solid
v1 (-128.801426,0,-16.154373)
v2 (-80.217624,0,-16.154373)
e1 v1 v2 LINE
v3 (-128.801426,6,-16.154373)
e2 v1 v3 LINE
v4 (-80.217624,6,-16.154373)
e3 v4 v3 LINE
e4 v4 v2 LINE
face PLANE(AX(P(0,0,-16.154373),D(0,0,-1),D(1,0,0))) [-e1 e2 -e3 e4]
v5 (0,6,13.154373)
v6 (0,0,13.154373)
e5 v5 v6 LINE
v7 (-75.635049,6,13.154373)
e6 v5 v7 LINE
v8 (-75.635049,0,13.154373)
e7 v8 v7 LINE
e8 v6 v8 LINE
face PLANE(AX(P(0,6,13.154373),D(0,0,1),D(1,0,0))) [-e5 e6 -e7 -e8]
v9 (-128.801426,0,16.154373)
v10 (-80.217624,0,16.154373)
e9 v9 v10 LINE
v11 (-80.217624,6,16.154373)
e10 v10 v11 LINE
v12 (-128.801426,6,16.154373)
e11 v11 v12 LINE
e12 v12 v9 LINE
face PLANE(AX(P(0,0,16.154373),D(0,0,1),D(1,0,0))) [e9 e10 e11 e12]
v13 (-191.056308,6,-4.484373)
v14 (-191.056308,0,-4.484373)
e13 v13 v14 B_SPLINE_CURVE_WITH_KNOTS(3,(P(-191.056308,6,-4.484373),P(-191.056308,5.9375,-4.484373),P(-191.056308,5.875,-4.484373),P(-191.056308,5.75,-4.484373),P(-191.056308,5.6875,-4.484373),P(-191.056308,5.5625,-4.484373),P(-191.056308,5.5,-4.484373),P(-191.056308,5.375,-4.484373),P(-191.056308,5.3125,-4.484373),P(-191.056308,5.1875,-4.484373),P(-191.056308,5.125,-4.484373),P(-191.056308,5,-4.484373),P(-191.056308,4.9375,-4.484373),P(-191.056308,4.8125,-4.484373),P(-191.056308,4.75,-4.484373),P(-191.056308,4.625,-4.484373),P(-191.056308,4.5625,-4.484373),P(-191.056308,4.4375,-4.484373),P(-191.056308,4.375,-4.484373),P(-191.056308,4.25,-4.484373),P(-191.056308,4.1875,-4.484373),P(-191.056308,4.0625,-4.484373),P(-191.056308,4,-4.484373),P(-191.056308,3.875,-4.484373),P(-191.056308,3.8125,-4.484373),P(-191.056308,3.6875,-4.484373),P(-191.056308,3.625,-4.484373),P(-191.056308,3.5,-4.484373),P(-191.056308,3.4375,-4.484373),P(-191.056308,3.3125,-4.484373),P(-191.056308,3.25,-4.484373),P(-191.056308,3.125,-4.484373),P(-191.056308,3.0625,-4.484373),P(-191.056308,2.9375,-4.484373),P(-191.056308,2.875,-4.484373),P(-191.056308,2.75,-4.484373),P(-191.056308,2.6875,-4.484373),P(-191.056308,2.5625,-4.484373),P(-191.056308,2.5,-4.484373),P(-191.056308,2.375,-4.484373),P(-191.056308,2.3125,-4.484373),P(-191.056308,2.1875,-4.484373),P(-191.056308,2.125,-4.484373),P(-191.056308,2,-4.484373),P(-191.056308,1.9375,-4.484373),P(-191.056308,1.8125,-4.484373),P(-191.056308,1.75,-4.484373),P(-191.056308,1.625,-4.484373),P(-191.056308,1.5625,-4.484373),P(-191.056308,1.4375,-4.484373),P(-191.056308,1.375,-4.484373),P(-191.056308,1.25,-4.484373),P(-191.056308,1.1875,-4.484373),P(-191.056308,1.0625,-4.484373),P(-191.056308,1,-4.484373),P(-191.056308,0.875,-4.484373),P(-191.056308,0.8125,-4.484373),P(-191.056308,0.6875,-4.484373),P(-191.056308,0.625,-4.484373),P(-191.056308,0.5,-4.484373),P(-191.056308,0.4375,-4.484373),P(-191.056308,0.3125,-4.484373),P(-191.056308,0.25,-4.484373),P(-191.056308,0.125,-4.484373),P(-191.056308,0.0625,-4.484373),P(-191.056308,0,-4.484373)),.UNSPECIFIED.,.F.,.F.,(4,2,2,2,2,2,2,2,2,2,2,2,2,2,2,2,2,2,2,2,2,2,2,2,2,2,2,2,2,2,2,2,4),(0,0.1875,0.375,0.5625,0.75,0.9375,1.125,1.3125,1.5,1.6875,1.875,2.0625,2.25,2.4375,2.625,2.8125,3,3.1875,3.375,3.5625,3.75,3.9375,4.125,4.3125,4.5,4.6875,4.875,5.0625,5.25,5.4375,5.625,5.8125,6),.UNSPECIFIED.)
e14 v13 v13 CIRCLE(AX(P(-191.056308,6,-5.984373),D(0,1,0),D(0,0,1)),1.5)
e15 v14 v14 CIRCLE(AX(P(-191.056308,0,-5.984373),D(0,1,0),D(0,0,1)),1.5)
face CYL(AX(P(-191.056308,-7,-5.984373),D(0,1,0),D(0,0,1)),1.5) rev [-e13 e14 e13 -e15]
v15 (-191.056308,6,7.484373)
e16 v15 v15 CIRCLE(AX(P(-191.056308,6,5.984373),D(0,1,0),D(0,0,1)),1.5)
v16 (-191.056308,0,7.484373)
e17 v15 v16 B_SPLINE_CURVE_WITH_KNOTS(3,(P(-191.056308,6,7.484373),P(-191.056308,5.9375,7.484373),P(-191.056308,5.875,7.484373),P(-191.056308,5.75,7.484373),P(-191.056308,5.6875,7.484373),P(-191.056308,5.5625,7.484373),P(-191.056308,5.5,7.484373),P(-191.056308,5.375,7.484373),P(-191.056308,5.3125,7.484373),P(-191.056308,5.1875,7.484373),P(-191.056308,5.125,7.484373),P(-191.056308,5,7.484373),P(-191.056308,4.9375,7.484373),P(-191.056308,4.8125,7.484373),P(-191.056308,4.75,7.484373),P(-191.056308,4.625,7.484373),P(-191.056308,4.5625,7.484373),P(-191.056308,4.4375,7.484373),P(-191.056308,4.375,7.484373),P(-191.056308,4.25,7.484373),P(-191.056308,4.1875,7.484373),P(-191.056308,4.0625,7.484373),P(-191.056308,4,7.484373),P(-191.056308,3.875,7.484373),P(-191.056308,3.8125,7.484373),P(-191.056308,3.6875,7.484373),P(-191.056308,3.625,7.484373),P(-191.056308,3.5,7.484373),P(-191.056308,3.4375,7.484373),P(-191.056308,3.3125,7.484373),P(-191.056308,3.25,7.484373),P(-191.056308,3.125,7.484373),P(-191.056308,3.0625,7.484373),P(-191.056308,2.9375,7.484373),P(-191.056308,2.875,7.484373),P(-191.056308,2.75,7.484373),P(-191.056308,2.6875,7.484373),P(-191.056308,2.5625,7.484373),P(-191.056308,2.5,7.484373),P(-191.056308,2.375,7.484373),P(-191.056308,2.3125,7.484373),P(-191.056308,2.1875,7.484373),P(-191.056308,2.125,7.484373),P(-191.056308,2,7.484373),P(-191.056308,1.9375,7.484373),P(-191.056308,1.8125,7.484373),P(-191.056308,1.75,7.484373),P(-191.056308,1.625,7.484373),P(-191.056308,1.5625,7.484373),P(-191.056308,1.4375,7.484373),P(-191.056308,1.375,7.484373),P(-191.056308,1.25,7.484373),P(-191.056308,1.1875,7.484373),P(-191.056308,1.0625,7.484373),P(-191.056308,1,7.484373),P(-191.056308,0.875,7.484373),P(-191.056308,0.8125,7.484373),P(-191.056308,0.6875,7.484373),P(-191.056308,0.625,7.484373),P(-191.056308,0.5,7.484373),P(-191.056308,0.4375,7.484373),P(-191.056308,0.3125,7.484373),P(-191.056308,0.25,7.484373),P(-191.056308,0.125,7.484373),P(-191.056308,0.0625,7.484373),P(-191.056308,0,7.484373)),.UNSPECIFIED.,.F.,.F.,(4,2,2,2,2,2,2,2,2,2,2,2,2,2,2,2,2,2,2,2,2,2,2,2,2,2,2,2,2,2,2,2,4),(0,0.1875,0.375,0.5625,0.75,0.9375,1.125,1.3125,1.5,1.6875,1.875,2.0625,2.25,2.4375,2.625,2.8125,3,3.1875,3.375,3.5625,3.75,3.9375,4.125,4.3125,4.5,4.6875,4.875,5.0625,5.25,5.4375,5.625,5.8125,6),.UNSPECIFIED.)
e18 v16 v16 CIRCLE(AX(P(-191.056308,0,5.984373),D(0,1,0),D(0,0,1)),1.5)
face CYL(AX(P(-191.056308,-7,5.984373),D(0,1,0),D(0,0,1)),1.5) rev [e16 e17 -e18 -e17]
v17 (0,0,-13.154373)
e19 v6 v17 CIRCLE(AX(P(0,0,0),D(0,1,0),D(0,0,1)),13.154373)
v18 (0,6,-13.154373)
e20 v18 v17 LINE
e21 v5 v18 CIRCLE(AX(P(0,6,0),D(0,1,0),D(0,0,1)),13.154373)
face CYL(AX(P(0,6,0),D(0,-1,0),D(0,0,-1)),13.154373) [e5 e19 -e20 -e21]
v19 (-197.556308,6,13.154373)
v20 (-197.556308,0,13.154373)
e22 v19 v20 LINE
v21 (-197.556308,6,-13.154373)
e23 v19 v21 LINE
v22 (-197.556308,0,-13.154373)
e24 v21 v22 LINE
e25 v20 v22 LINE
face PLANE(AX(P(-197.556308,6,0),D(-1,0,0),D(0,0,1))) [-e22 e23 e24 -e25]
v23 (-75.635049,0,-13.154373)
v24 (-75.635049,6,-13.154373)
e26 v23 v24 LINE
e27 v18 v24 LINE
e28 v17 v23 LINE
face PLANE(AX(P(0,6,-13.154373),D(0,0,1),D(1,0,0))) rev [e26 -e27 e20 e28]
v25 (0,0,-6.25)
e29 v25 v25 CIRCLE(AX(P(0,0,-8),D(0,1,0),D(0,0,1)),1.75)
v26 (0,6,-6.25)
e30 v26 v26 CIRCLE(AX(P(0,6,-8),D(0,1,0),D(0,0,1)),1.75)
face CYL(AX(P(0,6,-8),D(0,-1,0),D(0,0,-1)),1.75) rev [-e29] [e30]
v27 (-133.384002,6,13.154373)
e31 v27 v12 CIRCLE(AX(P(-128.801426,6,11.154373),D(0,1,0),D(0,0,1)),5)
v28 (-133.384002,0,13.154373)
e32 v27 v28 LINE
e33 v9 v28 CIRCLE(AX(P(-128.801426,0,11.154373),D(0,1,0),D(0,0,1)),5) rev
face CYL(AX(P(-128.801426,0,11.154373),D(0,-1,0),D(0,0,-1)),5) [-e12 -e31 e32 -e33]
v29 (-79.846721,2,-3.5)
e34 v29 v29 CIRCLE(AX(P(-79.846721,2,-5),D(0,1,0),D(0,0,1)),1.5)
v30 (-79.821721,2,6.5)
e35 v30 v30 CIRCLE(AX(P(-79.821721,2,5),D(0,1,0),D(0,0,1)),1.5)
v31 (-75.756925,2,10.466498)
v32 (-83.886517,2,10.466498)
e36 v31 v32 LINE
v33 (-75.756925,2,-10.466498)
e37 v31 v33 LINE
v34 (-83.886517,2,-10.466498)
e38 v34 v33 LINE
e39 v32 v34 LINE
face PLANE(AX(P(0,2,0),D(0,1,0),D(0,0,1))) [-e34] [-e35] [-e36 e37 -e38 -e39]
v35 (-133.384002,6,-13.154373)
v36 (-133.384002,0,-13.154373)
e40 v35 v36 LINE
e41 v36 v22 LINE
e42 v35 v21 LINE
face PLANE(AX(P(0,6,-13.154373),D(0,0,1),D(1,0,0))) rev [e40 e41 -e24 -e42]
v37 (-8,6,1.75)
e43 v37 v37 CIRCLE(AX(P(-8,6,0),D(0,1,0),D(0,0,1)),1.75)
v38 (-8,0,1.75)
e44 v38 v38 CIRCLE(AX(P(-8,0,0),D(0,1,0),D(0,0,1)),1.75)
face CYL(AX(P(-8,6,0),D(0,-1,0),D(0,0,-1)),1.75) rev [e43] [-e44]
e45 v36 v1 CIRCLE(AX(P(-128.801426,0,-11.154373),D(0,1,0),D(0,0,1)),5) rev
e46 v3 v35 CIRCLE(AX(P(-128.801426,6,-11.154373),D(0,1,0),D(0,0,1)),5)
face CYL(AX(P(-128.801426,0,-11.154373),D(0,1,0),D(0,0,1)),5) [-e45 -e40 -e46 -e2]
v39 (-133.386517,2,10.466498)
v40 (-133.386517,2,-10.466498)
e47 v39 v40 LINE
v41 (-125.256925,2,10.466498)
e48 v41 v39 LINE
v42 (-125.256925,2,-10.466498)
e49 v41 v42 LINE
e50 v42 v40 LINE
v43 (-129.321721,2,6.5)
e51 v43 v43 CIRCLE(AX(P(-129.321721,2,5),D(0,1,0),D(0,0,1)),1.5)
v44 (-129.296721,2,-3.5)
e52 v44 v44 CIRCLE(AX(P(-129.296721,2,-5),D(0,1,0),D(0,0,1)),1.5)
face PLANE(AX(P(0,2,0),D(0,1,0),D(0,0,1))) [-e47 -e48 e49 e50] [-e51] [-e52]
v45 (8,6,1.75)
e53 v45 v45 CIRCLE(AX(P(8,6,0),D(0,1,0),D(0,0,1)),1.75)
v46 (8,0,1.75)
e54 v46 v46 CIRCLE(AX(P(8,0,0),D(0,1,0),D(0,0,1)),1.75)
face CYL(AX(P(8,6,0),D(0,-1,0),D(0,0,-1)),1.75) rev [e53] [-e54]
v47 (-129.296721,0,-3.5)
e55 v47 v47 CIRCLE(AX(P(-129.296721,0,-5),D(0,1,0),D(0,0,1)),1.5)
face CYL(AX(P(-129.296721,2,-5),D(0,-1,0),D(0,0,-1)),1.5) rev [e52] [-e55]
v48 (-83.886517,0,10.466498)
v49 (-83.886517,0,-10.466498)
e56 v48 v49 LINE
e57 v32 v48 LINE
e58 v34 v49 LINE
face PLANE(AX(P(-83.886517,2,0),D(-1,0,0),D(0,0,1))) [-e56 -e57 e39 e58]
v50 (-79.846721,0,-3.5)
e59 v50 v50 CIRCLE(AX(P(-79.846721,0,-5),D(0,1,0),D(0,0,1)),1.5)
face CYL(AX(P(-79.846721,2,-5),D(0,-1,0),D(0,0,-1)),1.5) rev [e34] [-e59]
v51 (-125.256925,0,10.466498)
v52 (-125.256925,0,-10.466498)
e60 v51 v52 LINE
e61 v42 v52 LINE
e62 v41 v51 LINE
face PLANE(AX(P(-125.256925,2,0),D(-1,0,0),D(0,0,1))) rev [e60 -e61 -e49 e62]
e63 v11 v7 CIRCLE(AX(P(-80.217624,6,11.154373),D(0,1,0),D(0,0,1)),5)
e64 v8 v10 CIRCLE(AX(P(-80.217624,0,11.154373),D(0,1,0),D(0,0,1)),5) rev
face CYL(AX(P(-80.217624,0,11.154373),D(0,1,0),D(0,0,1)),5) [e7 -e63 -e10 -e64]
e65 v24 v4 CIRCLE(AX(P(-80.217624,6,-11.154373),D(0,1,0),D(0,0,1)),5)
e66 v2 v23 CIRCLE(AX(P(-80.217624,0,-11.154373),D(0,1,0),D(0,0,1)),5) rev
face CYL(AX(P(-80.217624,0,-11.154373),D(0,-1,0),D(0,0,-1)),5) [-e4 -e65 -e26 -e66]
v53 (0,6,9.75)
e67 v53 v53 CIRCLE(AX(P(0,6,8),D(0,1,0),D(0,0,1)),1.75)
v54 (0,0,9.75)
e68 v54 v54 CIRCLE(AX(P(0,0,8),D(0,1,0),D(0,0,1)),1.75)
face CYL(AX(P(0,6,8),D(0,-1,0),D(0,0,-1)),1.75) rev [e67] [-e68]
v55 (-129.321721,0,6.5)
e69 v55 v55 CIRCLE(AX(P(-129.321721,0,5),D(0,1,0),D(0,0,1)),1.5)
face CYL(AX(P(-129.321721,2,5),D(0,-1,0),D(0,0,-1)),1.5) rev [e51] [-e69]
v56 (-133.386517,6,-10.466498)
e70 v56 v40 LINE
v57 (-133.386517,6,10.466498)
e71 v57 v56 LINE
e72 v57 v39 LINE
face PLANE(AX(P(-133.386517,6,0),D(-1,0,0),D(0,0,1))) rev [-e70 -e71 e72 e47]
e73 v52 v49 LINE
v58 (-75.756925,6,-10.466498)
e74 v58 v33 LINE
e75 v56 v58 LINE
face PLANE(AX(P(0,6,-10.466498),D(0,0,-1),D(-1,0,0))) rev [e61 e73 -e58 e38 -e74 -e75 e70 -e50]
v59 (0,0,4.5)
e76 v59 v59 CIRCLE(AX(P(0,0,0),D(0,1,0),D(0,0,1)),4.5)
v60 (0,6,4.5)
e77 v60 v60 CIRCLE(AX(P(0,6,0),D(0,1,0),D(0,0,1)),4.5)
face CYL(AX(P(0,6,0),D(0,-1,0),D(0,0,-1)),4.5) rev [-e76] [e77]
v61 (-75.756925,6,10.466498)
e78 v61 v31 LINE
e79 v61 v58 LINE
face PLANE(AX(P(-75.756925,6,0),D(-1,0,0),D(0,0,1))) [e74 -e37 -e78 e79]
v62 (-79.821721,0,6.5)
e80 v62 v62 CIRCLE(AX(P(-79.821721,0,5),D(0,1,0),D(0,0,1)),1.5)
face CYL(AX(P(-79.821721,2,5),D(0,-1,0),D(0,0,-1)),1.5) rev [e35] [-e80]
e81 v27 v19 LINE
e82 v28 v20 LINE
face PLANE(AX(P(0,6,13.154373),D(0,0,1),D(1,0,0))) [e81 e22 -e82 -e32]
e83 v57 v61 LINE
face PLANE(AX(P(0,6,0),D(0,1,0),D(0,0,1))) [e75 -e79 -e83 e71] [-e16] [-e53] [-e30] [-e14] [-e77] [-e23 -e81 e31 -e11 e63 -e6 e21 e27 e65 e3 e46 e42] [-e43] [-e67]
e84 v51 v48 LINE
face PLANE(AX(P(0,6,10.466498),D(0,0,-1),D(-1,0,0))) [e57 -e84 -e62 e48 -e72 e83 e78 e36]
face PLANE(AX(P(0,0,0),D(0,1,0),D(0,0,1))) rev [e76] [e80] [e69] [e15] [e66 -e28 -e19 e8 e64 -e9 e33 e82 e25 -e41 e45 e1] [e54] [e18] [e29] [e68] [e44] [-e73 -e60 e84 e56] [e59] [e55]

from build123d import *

# Parameters (mm, degrees)
SKETCH1_W            = 57.629592668
SKETCH1_H            = 21.211867522
SKETCH1_R            = 1.75
SKETCH1_R_2          = 4.5
BOSS_EXTRUDE1_DEPTH  = 6
SKETCH1_22_W         = 8.129592668
SKETCH1_22_H         = 21.211867522
SKETCH1_22_R         = 1.5
BOSS_EXTRUDE2_DEPTH  = 2
SKETCH4_W            = 57.748953374
SKETCH4_H            = 6
BOSS_EXTRUDE4_DEPTH  = 3
FILLET2_R            = 5
FILLET2_OF_MIRROR1_R = 5
SKETCH8_R            = 1.5
CUT_EXTRUDE4_DEPTH   = 13


with BuildPart() as part:
    # Sketch1 → Boss-Extrude1 (new body)
    with BuildSketch(Plane(origin=(0, 0, 0), x_dir=(1, 0, 0), z_dir=(0, 1, 0))):
        with BuildLine():
            Line((-197.556308439, -13.154372872), (0, -13.154372872))
            ThreePointArc((0, -13.154372872), (13.154372872, 0), (0, 13.154372872))
            Line((0, 13.154372872), (-197.556308439, 13.154372872))
            Line((-197.556308439, 13.154372872), (-197.556308439, -13.154372872))
        make_face()
        with Locations((-104.57172107, -0.139435446)):
            Rectangle(SKETCH1_W, SKETCH1_H, mode=Mode.SUBTRACT)
        with Locations(Location((0, 8, 0), (0, 0, 270))):
            Circle(SKETCH1_R, mode=Mode.SUBTRACT)
        with Locations(Location((0, -8, 0), (0, 0, 270))):
            Circle(SKETCH1_R, mode=Mode.SUBTRACT)
        with Locations(Location((-8, 0, 0), (0, 0, 270))):
            Circle(SKETCH1_R, mode=Mode.SUBTRACT)
        with Locations(Location((0, 0, 0), (0, 0, 270))):
            Circle(SKETCH1_R_2, mode=Mode.SUBTRACT)
        with Locations(Location((8, 0, 0), (0, 0, 270))):
            Circle(SKETCH1_R, mode=Mode.SUBTRACT)
    boss_extrude1 = extrude(amount=BOSS_EXTRUDE1_DEPTH)

    # Sketch1<22> → Boss-Extrude2 (add)
    # profile 1 of 2: a face of its own
    with BuildSketch(Plane(origin=(0, 0, 0), x_dir=(1, 0, 0), z_dir=(0, 1, 0))):
        with Locations((-129.32172107, -0.139435446)):
            Rectangle(SKETCH1_22_W, SKETCH1_22_H)
        with Locations(Location((-129.32172107, -5, 0), (0, 0, 270))):
            Circle(SKETCH1_22_R, mode=Mode.SUBTRACT)
        with Locations(Location((-129.29672107, 5, 0), (0, 0, 270))):
            Circle(SKETCH1_22_R, mode=Mode.SUBTRACT)
    # profile 2 of 2: a face of its own
    with BuildSketch(Plane(origin=(0, 0, 0), x_dir=(1, 0, 0), z_dir=(0, 1, 0))):
        with Locations((-79.82172107, -0.139435446)):
            Rectangle(SKETCH1_22_W, SKETCH1_22_H)
        with Locations(Location((-79.82172107, -5, 0), (0, 0, 270))):
            Circle(SKETCH1_22_R, mode=Mode.SUBTRACT)
        with Locations(Location((-79.84672107, 5, 0), (0, 0, 270))):
            Circle(SKETCH1_22_R, mode=Mode.SUBTRACT)
    extrude(amount=BOSS_EXTRUDE2_DEPTH)

    # Sketch4 → Boss-Extrude4 (add)
    with BuildSketch(Plane.XY.offset(13.154372872)):
        with Locations((-104.509525291, 3)):
            Rectangle(SKETCH4_W, SKETCH4_H)
    boss_extrude4 = extrude(amount=BOSS_EXTRUDE4_DEPTH)

    # Fillet2
    # the kernel refuses this fillet: 5 mm, written as the material it takes off along each edge
    with BuildSketch(Plane(origin=(-75.635048604, -11.456439237, 16.154372872), x_dir=(0, 0, -1), z_dir=(0, 1, 0)), Plane(origin=(-133.384001978, 17.456439237, 16.154372872), x_dir=(0, 0, -1), z_dir=(0, -1, 0))) as fillet2_piece_1:
        with BuildLine():
            CenterArc((5, 4.582575695), FILLET2_R, 180, 66.421821522)
            Line((0, 4.582575695), (-0.1, 4.582575695))
            Line((-0.1, 4.582575695), (-0.1, 0))
            Line((-0.1, 0), (0, -0.1))
            ThreePointArc((0, -0.1), (1.5, -0.1), (2.96, -0.091651514))
            Line((2.96, -0.091651514), (3, 0))
        make_face()
    extrude(amount=28.912878475, mode=Mode.SUBTRACT)

    # Mirror1: Boss-Extrude1, Boss-Extrude4 across plane
    add(boss_extrude1.mirror(Plane(origin=(0, 0, 0), x_dir=(1, 0, 0), z_dir=(0, 0, -1))))
    add(boss_extrude4.mirror(Plane(origin=(0, 0, 0), x_dir=(1, 0, 0), z_dir=(0, 0, -1))))

    # Fillet2 of Mirror1
    # the kernel refuses this fillet: 5 mm, written as the material it takes off along each edge
    with BuildSketch(Plane(origin=(-75.635048604, -11.456439237, -16.154372872), x_dir=(0, 0, 1), z_dir=(0, 1, 0))) as fillet2_of_mirror1_piece_1:
        with BuildLine():
            CenterArc((5, -4.582575695), FILLET2_OF_MIRROR1_R, 113.578178478, 66.421821522)
            Line((0, -4.582575695), (-0.1, -4.582575695))
            Line((-0.1, -4.582575695), (-0.1, 0))
            Line((-0.1, 0), (0, 0.1))
            ThreePointArc((0, 0.1), (1.5, 0.1), (2.96, 0.091651514))
            Line((2.96, 0.091651514), (3, 0))
        make_face()
    extrude(amount=28.912878475, mode=Mode.SUBTRACT)
    with BuildSketch(Plane(origin=(-133.384001978, 17.456439237, -16.154372872), x_dir=(1, 0, 0), z_dir=(0, -1, 0))) as fillet2_of_mirror1_piece_2:
        with BuildLine():
            CenterArc((4.582575695, 5), FILLET2_OF_MIRROR1_R, 203.578178478, 66.421821522)
            Line((0, 3), (-0.091651514, 2.96))
            ThreePointArc((-0.091651514, 2.96), (-0.1, 1.5), (-0.1, 0))
            Line((-0.1, 0), (0, -0.1))
            Line((0, -0.1), (4.582575695, -0.1))
            Line((4.582575695, -0.1), (4.582575695, 0))
        make_face()
    extrude(amount=28.912878475, mode=Mode.SUBTRACT)

    # Sketch8 → Cut-Extrude4 (cut)
    with BuildSketch(Plane(origin=(0, 6, 0), x_dir=(1, 0, 0), z_dir=(0, 1, 0))):
        with Locations(Location((-191.056308439, -5.984372872, 0), (0, 0, 270))):
            Circle(SKETCH8_R)
        with Locations(Location((-191.056308439, 5.984372872, 0), (0, 0, 270))):
            Circle(SKETCH8_R)
    extrude(amount=-CUT_EXTRUDE4_DEPTH, mode=Mode.SUBTRACT)


solid = part.part
